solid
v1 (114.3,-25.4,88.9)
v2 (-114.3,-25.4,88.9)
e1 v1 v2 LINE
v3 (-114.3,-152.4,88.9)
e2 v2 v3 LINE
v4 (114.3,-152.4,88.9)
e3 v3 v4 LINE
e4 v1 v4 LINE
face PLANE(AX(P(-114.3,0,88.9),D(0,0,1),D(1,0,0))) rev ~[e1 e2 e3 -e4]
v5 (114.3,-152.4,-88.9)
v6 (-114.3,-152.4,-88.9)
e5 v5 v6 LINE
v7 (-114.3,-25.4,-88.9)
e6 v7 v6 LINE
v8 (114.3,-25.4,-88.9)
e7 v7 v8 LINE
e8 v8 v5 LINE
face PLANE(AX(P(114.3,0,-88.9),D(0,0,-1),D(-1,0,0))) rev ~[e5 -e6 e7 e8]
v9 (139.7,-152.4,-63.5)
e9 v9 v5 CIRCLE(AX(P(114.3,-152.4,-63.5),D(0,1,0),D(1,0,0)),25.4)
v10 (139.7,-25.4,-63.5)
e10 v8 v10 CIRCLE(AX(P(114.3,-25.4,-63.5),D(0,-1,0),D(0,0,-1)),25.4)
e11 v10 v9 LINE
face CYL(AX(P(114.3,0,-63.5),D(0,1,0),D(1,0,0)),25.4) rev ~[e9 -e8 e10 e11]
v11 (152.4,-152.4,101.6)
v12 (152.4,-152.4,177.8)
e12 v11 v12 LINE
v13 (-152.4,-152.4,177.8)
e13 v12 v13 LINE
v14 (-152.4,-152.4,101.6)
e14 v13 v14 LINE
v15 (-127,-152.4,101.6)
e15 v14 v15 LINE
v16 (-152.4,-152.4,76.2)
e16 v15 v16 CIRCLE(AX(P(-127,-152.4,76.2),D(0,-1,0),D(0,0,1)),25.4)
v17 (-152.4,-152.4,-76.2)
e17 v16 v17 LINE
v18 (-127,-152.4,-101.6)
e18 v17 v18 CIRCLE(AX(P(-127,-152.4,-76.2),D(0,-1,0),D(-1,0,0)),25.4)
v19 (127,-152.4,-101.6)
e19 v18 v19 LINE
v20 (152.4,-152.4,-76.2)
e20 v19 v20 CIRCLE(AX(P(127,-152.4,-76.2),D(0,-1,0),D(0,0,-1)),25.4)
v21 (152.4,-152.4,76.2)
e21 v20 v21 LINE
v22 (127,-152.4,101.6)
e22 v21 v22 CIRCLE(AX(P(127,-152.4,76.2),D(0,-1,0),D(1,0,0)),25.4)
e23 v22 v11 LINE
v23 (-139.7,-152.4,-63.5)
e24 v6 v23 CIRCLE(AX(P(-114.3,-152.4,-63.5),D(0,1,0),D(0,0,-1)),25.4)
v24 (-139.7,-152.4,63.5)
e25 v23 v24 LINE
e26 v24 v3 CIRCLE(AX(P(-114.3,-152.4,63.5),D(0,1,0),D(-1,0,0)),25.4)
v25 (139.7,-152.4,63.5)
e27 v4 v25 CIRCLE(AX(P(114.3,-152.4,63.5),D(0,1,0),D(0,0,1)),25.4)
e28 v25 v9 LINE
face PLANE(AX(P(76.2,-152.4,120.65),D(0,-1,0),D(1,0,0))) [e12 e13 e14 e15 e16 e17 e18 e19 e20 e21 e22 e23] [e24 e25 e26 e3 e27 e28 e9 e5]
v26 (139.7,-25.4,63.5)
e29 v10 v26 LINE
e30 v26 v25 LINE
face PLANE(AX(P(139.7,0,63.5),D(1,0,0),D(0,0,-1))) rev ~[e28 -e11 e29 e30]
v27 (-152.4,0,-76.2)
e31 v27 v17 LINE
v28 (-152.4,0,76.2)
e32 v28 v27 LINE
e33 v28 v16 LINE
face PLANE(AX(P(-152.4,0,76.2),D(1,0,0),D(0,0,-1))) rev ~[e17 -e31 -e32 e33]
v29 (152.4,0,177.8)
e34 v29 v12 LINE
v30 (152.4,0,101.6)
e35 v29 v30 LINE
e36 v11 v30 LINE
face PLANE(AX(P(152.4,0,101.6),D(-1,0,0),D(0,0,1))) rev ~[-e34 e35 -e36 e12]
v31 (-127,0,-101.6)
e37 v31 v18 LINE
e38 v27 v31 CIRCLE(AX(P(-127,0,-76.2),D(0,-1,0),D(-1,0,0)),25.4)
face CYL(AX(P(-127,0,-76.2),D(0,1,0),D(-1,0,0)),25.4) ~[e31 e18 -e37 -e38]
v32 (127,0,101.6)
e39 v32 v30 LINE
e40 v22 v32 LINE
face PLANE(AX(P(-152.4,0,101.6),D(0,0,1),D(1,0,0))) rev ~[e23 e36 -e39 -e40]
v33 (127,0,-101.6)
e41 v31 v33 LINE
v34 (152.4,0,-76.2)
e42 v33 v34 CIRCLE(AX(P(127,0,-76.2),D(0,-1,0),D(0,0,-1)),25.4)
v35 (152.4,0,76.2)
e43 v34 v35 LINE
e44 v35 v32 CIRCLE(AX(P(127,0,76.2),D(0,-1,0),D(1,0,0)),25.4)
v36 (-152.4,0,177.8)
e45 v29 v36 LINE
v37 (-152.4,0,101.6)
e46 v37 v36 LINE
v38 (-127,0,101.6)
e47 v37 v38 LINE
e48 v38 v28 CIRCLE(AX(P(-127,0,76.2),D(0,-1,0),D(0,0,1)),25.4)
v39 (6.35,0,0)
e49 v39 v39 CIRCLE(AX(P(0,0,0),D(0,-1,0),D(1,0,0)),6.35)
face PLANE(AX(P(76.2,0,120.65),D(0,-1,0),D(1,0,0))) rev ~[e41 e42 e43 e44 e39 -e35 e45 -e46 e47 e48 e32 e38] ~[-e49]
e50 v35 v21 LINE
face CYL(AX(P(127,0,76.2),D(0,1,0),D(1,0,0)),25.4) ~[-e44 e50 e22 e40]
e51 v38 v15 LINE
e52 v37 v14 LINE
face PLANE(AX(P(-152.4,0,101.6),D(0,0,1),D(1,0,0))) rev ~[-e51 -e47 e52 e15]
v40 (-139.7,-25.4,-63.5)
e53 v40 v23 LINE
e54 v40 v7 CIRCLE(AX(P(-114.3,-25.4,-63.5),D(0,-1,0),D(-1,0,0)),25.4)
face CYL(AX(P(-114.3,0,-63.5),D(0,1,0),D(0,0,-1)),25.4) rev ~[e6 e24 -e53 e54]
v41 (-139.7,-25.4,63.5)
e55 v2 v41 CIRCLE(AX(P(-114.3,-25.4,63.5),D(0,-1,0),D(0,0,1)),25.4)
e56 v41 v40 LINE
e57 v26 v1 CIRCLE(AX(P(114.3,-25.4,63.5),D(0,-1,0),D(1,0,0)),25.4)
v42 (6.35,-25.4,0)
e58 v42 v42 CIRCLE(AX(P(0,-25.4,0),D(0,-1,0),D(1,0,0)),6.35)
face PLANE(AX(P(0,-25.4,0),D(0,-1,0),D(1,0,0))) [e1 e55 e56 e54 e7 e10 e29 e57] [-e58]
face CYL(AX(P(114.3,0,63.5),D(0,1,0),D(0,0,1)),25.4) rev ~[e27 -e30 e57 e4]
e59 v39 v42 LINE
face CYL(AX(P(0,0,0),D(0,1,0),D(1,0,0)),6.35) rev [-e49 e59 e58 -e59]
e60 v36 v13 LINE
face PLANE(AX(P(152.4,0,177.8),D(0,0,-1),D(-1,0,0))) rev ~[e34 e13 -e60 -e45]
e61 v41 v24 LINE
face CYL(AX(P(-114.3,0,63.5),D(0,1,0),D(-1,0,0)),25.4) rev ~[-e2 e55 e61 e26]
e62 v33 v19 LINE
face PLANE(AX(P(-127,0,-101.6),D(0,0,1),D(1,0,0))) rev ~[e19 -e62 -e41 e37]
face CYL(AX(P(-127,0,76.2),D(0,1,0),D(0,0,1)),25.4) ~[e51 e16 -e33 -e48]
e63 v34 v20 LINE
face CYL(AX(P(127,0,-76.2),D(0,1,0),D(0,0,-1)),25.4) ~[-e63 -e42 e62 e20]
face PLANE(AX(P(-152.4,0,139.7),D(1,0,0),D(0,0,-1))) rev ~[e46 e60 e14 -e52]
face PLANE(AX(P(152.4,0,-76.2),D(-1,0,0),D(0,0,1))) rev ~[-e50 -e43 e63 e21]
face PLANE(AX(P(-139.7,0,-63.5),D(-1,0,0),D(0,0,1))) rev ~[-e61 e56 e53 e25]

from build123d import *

# Parameters (mm, degrees)
F1_DEPTH = 25.4
F0_R     = 6.35
F2_DEPTH = 152.4
F0_W     = 152.4
F0_H     = 38.1
F3_DEPTH = 152.4


with BuildPart() as f1:
    # F0 (on Front) → F1 (new body)
    with BuildSketch(Plane.XZ):
        Polygon((127, 101.6), (152.4, 101.6), (152.4, 139.7), (0, 139.7), (0, 101.6), align=None)
        Polygon((-127, 101.6), (0, 101.6), (0, 139.7), (-152.4, 139.7), (-152.4, 101.6), align=None)
    extrude(amount=F1_DEPTH)



with BuildPart() as f1b:
    # F0 (on Front) → F1, piece 2 (new body)
    with BuildSketch(Plane.XZ):
        with BuildLine():
            ThreePointArc((139.7, 63.5), (132.2605122421, 81.4605122421), (114.3, 88.9))
            Line((114.3, 88.9), (-114.3, 88.9))
            ThreePointArc((-114.3, 88.9), (-132.2605122421, 81.4605122421), (-139.7, 63.5))
            Line((-139.7, 63.5), (-139.7, -63.5))
            ThreePointArc((-139.7, -63.5), (-132.2605122421, -81.4605122421), (-114.3, -88.9))
            Line((-114.3, -88.9), (114.3, -88.9))
            ThreePointArc((114.3, -88.9), (132.2605122421, -81.4605122421), (139.7, -63.5))
            Line((139.7, -63.5), (139.7, 63.5))
        make_face()
        Circle(F0_R, mode=Mode.SUBTRACT)
    extrude(amount=F1_DEPTH)


with BuildPart() as f1_1:
    add(f1.part)

    add(f1b.part)  # F2 merges F1b
    # F0 (on Front) → F2 (join)
    with BuildSketch(Plane.XZ):
        Polygon((127, 101.6), (152.4, 101.6), (152.4, 139.7), (0, 139.7), (0, 101.6), align=None)
        with BuildLine():
            ThreePointArc((152.4, 76.2), (144.9605122421, 94.1605122421), (127, 101.6))
            Line((127, 101.6), (0, 101.6))
            Line((0, 101.6), (-127, 101.6))
            ThreePointArc((-127, 101.6), (-144.9605122421, 94.1605122421), (-152.4, 76.2))
            Line((-152.4, 76.2), (-152.4, -76.2))
            ThreePointArc((-152.4, -76.2), (-144.9605122421, -94.1605122421), (-127, -101.6))
            Line((-127, -101.6), (127, -101.6))
            ThreePointArc((127, -101.6), (144.9605122421, -94.1605122421), (152.4, -76.2))
            Line((152.4, -76.2), (152.4, 76.2))
        make_face()
        with BuildLine():
            Line((-114.3, 88.9), (114.3, 88.9))
            ThreePointArc((114.3, 88.9), (132.2605122421, 81.4605122421), (139.7, 63.5))
            Line((139.7, 63.5), (139.7, -63.5))
            ThreePointArc((139.7, -63.5), (132.2605122421, -81.4605122421), (114.3, -88.9))
            Line((114.3, -88.9), (-114.3, -88.9))
            ThreePointArc((-114.3, -88.9), (-132.2605122421, -81.4605122421), (-139.7, -63.5))
            Line((-139.7, -63.5), (-139.7, 63.5))
            ThreePointArc((-139.7, 63.5), (-132.2605122421, 81.4605122421), (-114.3, 88.9))
        make_face(mode=Mode.SUBTRACT)
        Polygon((-127, 101.6), (0, 101.6), (0, 139.7), (-152.4, 139.7), (-152.4, 101.6), align=None)
    extrude(amount=F2_DEPTH)

    # F0 (on Front) → F3 (join)
    with BuildSketch(Plane.XZ):
        with BuildLine():
            ThreePointArc((152.4, 76.2), (144.9605122421, 94.1605122421), (127, 101.6))
            Line((127, 101.6), (0, 101.6))
            Line((0, 101.6), (-127, 101.6))
            ThreePointArc((-127, 101.6), (-144.9605122421, 94.1605122421), (-152.4, 76.2))
            Line((-152.4, 76.2), (-152.4, -76.2))
            ThreePointArc((-152.4, -76.2), (-144.9605122421, -94.1605122421), (-127, -101.6))
            Line((-127, -101.6), (127, -101.6))
            ThreePointArc((127, -101.6), (144.9605122421, -94.1605122421), (152.4, -76.2))
            Line((152.4, -76.2), (152.4, 76.2))
        make_face()
        with BuildLine():
            Line((-114.3, 88.9), (114.3, 88.9))
            ThreePointArc((114.3, 88.9), (132.2605122421, 81.4605122421), (139.7, 63.5))
            Line((139.7, 63.5), (139.7, -63.5))
            ThreePointArc((139.7, -63.5), (132.2605122421, -81.4605122421), (114.3, -88.9))
            Line((114.3, -88.9), (-114.3, -88.9))
            ThreePointArc((-114.3, -88.9), (-132.2605122421, -81.4605122421), (-139.7, -63.5))
            Line((-139.7, -63.5), (-139.7, 63.5))
            ThreePointArc((-139.7, 63.5), (-132.2605122421, 81.4605122421), (-114.3, 88.9))
        make_face(mode=Mode.SUBTRACT)
        with Locations((-76.2, 158.75)):
            Rectangle(F0_W, F0_H)
        with Locations((76.2, 158.75)):
            Rectangle(F0_W, F0_H)
    extrude(amount=F3_DEPTH)


solid = f1_1.part
